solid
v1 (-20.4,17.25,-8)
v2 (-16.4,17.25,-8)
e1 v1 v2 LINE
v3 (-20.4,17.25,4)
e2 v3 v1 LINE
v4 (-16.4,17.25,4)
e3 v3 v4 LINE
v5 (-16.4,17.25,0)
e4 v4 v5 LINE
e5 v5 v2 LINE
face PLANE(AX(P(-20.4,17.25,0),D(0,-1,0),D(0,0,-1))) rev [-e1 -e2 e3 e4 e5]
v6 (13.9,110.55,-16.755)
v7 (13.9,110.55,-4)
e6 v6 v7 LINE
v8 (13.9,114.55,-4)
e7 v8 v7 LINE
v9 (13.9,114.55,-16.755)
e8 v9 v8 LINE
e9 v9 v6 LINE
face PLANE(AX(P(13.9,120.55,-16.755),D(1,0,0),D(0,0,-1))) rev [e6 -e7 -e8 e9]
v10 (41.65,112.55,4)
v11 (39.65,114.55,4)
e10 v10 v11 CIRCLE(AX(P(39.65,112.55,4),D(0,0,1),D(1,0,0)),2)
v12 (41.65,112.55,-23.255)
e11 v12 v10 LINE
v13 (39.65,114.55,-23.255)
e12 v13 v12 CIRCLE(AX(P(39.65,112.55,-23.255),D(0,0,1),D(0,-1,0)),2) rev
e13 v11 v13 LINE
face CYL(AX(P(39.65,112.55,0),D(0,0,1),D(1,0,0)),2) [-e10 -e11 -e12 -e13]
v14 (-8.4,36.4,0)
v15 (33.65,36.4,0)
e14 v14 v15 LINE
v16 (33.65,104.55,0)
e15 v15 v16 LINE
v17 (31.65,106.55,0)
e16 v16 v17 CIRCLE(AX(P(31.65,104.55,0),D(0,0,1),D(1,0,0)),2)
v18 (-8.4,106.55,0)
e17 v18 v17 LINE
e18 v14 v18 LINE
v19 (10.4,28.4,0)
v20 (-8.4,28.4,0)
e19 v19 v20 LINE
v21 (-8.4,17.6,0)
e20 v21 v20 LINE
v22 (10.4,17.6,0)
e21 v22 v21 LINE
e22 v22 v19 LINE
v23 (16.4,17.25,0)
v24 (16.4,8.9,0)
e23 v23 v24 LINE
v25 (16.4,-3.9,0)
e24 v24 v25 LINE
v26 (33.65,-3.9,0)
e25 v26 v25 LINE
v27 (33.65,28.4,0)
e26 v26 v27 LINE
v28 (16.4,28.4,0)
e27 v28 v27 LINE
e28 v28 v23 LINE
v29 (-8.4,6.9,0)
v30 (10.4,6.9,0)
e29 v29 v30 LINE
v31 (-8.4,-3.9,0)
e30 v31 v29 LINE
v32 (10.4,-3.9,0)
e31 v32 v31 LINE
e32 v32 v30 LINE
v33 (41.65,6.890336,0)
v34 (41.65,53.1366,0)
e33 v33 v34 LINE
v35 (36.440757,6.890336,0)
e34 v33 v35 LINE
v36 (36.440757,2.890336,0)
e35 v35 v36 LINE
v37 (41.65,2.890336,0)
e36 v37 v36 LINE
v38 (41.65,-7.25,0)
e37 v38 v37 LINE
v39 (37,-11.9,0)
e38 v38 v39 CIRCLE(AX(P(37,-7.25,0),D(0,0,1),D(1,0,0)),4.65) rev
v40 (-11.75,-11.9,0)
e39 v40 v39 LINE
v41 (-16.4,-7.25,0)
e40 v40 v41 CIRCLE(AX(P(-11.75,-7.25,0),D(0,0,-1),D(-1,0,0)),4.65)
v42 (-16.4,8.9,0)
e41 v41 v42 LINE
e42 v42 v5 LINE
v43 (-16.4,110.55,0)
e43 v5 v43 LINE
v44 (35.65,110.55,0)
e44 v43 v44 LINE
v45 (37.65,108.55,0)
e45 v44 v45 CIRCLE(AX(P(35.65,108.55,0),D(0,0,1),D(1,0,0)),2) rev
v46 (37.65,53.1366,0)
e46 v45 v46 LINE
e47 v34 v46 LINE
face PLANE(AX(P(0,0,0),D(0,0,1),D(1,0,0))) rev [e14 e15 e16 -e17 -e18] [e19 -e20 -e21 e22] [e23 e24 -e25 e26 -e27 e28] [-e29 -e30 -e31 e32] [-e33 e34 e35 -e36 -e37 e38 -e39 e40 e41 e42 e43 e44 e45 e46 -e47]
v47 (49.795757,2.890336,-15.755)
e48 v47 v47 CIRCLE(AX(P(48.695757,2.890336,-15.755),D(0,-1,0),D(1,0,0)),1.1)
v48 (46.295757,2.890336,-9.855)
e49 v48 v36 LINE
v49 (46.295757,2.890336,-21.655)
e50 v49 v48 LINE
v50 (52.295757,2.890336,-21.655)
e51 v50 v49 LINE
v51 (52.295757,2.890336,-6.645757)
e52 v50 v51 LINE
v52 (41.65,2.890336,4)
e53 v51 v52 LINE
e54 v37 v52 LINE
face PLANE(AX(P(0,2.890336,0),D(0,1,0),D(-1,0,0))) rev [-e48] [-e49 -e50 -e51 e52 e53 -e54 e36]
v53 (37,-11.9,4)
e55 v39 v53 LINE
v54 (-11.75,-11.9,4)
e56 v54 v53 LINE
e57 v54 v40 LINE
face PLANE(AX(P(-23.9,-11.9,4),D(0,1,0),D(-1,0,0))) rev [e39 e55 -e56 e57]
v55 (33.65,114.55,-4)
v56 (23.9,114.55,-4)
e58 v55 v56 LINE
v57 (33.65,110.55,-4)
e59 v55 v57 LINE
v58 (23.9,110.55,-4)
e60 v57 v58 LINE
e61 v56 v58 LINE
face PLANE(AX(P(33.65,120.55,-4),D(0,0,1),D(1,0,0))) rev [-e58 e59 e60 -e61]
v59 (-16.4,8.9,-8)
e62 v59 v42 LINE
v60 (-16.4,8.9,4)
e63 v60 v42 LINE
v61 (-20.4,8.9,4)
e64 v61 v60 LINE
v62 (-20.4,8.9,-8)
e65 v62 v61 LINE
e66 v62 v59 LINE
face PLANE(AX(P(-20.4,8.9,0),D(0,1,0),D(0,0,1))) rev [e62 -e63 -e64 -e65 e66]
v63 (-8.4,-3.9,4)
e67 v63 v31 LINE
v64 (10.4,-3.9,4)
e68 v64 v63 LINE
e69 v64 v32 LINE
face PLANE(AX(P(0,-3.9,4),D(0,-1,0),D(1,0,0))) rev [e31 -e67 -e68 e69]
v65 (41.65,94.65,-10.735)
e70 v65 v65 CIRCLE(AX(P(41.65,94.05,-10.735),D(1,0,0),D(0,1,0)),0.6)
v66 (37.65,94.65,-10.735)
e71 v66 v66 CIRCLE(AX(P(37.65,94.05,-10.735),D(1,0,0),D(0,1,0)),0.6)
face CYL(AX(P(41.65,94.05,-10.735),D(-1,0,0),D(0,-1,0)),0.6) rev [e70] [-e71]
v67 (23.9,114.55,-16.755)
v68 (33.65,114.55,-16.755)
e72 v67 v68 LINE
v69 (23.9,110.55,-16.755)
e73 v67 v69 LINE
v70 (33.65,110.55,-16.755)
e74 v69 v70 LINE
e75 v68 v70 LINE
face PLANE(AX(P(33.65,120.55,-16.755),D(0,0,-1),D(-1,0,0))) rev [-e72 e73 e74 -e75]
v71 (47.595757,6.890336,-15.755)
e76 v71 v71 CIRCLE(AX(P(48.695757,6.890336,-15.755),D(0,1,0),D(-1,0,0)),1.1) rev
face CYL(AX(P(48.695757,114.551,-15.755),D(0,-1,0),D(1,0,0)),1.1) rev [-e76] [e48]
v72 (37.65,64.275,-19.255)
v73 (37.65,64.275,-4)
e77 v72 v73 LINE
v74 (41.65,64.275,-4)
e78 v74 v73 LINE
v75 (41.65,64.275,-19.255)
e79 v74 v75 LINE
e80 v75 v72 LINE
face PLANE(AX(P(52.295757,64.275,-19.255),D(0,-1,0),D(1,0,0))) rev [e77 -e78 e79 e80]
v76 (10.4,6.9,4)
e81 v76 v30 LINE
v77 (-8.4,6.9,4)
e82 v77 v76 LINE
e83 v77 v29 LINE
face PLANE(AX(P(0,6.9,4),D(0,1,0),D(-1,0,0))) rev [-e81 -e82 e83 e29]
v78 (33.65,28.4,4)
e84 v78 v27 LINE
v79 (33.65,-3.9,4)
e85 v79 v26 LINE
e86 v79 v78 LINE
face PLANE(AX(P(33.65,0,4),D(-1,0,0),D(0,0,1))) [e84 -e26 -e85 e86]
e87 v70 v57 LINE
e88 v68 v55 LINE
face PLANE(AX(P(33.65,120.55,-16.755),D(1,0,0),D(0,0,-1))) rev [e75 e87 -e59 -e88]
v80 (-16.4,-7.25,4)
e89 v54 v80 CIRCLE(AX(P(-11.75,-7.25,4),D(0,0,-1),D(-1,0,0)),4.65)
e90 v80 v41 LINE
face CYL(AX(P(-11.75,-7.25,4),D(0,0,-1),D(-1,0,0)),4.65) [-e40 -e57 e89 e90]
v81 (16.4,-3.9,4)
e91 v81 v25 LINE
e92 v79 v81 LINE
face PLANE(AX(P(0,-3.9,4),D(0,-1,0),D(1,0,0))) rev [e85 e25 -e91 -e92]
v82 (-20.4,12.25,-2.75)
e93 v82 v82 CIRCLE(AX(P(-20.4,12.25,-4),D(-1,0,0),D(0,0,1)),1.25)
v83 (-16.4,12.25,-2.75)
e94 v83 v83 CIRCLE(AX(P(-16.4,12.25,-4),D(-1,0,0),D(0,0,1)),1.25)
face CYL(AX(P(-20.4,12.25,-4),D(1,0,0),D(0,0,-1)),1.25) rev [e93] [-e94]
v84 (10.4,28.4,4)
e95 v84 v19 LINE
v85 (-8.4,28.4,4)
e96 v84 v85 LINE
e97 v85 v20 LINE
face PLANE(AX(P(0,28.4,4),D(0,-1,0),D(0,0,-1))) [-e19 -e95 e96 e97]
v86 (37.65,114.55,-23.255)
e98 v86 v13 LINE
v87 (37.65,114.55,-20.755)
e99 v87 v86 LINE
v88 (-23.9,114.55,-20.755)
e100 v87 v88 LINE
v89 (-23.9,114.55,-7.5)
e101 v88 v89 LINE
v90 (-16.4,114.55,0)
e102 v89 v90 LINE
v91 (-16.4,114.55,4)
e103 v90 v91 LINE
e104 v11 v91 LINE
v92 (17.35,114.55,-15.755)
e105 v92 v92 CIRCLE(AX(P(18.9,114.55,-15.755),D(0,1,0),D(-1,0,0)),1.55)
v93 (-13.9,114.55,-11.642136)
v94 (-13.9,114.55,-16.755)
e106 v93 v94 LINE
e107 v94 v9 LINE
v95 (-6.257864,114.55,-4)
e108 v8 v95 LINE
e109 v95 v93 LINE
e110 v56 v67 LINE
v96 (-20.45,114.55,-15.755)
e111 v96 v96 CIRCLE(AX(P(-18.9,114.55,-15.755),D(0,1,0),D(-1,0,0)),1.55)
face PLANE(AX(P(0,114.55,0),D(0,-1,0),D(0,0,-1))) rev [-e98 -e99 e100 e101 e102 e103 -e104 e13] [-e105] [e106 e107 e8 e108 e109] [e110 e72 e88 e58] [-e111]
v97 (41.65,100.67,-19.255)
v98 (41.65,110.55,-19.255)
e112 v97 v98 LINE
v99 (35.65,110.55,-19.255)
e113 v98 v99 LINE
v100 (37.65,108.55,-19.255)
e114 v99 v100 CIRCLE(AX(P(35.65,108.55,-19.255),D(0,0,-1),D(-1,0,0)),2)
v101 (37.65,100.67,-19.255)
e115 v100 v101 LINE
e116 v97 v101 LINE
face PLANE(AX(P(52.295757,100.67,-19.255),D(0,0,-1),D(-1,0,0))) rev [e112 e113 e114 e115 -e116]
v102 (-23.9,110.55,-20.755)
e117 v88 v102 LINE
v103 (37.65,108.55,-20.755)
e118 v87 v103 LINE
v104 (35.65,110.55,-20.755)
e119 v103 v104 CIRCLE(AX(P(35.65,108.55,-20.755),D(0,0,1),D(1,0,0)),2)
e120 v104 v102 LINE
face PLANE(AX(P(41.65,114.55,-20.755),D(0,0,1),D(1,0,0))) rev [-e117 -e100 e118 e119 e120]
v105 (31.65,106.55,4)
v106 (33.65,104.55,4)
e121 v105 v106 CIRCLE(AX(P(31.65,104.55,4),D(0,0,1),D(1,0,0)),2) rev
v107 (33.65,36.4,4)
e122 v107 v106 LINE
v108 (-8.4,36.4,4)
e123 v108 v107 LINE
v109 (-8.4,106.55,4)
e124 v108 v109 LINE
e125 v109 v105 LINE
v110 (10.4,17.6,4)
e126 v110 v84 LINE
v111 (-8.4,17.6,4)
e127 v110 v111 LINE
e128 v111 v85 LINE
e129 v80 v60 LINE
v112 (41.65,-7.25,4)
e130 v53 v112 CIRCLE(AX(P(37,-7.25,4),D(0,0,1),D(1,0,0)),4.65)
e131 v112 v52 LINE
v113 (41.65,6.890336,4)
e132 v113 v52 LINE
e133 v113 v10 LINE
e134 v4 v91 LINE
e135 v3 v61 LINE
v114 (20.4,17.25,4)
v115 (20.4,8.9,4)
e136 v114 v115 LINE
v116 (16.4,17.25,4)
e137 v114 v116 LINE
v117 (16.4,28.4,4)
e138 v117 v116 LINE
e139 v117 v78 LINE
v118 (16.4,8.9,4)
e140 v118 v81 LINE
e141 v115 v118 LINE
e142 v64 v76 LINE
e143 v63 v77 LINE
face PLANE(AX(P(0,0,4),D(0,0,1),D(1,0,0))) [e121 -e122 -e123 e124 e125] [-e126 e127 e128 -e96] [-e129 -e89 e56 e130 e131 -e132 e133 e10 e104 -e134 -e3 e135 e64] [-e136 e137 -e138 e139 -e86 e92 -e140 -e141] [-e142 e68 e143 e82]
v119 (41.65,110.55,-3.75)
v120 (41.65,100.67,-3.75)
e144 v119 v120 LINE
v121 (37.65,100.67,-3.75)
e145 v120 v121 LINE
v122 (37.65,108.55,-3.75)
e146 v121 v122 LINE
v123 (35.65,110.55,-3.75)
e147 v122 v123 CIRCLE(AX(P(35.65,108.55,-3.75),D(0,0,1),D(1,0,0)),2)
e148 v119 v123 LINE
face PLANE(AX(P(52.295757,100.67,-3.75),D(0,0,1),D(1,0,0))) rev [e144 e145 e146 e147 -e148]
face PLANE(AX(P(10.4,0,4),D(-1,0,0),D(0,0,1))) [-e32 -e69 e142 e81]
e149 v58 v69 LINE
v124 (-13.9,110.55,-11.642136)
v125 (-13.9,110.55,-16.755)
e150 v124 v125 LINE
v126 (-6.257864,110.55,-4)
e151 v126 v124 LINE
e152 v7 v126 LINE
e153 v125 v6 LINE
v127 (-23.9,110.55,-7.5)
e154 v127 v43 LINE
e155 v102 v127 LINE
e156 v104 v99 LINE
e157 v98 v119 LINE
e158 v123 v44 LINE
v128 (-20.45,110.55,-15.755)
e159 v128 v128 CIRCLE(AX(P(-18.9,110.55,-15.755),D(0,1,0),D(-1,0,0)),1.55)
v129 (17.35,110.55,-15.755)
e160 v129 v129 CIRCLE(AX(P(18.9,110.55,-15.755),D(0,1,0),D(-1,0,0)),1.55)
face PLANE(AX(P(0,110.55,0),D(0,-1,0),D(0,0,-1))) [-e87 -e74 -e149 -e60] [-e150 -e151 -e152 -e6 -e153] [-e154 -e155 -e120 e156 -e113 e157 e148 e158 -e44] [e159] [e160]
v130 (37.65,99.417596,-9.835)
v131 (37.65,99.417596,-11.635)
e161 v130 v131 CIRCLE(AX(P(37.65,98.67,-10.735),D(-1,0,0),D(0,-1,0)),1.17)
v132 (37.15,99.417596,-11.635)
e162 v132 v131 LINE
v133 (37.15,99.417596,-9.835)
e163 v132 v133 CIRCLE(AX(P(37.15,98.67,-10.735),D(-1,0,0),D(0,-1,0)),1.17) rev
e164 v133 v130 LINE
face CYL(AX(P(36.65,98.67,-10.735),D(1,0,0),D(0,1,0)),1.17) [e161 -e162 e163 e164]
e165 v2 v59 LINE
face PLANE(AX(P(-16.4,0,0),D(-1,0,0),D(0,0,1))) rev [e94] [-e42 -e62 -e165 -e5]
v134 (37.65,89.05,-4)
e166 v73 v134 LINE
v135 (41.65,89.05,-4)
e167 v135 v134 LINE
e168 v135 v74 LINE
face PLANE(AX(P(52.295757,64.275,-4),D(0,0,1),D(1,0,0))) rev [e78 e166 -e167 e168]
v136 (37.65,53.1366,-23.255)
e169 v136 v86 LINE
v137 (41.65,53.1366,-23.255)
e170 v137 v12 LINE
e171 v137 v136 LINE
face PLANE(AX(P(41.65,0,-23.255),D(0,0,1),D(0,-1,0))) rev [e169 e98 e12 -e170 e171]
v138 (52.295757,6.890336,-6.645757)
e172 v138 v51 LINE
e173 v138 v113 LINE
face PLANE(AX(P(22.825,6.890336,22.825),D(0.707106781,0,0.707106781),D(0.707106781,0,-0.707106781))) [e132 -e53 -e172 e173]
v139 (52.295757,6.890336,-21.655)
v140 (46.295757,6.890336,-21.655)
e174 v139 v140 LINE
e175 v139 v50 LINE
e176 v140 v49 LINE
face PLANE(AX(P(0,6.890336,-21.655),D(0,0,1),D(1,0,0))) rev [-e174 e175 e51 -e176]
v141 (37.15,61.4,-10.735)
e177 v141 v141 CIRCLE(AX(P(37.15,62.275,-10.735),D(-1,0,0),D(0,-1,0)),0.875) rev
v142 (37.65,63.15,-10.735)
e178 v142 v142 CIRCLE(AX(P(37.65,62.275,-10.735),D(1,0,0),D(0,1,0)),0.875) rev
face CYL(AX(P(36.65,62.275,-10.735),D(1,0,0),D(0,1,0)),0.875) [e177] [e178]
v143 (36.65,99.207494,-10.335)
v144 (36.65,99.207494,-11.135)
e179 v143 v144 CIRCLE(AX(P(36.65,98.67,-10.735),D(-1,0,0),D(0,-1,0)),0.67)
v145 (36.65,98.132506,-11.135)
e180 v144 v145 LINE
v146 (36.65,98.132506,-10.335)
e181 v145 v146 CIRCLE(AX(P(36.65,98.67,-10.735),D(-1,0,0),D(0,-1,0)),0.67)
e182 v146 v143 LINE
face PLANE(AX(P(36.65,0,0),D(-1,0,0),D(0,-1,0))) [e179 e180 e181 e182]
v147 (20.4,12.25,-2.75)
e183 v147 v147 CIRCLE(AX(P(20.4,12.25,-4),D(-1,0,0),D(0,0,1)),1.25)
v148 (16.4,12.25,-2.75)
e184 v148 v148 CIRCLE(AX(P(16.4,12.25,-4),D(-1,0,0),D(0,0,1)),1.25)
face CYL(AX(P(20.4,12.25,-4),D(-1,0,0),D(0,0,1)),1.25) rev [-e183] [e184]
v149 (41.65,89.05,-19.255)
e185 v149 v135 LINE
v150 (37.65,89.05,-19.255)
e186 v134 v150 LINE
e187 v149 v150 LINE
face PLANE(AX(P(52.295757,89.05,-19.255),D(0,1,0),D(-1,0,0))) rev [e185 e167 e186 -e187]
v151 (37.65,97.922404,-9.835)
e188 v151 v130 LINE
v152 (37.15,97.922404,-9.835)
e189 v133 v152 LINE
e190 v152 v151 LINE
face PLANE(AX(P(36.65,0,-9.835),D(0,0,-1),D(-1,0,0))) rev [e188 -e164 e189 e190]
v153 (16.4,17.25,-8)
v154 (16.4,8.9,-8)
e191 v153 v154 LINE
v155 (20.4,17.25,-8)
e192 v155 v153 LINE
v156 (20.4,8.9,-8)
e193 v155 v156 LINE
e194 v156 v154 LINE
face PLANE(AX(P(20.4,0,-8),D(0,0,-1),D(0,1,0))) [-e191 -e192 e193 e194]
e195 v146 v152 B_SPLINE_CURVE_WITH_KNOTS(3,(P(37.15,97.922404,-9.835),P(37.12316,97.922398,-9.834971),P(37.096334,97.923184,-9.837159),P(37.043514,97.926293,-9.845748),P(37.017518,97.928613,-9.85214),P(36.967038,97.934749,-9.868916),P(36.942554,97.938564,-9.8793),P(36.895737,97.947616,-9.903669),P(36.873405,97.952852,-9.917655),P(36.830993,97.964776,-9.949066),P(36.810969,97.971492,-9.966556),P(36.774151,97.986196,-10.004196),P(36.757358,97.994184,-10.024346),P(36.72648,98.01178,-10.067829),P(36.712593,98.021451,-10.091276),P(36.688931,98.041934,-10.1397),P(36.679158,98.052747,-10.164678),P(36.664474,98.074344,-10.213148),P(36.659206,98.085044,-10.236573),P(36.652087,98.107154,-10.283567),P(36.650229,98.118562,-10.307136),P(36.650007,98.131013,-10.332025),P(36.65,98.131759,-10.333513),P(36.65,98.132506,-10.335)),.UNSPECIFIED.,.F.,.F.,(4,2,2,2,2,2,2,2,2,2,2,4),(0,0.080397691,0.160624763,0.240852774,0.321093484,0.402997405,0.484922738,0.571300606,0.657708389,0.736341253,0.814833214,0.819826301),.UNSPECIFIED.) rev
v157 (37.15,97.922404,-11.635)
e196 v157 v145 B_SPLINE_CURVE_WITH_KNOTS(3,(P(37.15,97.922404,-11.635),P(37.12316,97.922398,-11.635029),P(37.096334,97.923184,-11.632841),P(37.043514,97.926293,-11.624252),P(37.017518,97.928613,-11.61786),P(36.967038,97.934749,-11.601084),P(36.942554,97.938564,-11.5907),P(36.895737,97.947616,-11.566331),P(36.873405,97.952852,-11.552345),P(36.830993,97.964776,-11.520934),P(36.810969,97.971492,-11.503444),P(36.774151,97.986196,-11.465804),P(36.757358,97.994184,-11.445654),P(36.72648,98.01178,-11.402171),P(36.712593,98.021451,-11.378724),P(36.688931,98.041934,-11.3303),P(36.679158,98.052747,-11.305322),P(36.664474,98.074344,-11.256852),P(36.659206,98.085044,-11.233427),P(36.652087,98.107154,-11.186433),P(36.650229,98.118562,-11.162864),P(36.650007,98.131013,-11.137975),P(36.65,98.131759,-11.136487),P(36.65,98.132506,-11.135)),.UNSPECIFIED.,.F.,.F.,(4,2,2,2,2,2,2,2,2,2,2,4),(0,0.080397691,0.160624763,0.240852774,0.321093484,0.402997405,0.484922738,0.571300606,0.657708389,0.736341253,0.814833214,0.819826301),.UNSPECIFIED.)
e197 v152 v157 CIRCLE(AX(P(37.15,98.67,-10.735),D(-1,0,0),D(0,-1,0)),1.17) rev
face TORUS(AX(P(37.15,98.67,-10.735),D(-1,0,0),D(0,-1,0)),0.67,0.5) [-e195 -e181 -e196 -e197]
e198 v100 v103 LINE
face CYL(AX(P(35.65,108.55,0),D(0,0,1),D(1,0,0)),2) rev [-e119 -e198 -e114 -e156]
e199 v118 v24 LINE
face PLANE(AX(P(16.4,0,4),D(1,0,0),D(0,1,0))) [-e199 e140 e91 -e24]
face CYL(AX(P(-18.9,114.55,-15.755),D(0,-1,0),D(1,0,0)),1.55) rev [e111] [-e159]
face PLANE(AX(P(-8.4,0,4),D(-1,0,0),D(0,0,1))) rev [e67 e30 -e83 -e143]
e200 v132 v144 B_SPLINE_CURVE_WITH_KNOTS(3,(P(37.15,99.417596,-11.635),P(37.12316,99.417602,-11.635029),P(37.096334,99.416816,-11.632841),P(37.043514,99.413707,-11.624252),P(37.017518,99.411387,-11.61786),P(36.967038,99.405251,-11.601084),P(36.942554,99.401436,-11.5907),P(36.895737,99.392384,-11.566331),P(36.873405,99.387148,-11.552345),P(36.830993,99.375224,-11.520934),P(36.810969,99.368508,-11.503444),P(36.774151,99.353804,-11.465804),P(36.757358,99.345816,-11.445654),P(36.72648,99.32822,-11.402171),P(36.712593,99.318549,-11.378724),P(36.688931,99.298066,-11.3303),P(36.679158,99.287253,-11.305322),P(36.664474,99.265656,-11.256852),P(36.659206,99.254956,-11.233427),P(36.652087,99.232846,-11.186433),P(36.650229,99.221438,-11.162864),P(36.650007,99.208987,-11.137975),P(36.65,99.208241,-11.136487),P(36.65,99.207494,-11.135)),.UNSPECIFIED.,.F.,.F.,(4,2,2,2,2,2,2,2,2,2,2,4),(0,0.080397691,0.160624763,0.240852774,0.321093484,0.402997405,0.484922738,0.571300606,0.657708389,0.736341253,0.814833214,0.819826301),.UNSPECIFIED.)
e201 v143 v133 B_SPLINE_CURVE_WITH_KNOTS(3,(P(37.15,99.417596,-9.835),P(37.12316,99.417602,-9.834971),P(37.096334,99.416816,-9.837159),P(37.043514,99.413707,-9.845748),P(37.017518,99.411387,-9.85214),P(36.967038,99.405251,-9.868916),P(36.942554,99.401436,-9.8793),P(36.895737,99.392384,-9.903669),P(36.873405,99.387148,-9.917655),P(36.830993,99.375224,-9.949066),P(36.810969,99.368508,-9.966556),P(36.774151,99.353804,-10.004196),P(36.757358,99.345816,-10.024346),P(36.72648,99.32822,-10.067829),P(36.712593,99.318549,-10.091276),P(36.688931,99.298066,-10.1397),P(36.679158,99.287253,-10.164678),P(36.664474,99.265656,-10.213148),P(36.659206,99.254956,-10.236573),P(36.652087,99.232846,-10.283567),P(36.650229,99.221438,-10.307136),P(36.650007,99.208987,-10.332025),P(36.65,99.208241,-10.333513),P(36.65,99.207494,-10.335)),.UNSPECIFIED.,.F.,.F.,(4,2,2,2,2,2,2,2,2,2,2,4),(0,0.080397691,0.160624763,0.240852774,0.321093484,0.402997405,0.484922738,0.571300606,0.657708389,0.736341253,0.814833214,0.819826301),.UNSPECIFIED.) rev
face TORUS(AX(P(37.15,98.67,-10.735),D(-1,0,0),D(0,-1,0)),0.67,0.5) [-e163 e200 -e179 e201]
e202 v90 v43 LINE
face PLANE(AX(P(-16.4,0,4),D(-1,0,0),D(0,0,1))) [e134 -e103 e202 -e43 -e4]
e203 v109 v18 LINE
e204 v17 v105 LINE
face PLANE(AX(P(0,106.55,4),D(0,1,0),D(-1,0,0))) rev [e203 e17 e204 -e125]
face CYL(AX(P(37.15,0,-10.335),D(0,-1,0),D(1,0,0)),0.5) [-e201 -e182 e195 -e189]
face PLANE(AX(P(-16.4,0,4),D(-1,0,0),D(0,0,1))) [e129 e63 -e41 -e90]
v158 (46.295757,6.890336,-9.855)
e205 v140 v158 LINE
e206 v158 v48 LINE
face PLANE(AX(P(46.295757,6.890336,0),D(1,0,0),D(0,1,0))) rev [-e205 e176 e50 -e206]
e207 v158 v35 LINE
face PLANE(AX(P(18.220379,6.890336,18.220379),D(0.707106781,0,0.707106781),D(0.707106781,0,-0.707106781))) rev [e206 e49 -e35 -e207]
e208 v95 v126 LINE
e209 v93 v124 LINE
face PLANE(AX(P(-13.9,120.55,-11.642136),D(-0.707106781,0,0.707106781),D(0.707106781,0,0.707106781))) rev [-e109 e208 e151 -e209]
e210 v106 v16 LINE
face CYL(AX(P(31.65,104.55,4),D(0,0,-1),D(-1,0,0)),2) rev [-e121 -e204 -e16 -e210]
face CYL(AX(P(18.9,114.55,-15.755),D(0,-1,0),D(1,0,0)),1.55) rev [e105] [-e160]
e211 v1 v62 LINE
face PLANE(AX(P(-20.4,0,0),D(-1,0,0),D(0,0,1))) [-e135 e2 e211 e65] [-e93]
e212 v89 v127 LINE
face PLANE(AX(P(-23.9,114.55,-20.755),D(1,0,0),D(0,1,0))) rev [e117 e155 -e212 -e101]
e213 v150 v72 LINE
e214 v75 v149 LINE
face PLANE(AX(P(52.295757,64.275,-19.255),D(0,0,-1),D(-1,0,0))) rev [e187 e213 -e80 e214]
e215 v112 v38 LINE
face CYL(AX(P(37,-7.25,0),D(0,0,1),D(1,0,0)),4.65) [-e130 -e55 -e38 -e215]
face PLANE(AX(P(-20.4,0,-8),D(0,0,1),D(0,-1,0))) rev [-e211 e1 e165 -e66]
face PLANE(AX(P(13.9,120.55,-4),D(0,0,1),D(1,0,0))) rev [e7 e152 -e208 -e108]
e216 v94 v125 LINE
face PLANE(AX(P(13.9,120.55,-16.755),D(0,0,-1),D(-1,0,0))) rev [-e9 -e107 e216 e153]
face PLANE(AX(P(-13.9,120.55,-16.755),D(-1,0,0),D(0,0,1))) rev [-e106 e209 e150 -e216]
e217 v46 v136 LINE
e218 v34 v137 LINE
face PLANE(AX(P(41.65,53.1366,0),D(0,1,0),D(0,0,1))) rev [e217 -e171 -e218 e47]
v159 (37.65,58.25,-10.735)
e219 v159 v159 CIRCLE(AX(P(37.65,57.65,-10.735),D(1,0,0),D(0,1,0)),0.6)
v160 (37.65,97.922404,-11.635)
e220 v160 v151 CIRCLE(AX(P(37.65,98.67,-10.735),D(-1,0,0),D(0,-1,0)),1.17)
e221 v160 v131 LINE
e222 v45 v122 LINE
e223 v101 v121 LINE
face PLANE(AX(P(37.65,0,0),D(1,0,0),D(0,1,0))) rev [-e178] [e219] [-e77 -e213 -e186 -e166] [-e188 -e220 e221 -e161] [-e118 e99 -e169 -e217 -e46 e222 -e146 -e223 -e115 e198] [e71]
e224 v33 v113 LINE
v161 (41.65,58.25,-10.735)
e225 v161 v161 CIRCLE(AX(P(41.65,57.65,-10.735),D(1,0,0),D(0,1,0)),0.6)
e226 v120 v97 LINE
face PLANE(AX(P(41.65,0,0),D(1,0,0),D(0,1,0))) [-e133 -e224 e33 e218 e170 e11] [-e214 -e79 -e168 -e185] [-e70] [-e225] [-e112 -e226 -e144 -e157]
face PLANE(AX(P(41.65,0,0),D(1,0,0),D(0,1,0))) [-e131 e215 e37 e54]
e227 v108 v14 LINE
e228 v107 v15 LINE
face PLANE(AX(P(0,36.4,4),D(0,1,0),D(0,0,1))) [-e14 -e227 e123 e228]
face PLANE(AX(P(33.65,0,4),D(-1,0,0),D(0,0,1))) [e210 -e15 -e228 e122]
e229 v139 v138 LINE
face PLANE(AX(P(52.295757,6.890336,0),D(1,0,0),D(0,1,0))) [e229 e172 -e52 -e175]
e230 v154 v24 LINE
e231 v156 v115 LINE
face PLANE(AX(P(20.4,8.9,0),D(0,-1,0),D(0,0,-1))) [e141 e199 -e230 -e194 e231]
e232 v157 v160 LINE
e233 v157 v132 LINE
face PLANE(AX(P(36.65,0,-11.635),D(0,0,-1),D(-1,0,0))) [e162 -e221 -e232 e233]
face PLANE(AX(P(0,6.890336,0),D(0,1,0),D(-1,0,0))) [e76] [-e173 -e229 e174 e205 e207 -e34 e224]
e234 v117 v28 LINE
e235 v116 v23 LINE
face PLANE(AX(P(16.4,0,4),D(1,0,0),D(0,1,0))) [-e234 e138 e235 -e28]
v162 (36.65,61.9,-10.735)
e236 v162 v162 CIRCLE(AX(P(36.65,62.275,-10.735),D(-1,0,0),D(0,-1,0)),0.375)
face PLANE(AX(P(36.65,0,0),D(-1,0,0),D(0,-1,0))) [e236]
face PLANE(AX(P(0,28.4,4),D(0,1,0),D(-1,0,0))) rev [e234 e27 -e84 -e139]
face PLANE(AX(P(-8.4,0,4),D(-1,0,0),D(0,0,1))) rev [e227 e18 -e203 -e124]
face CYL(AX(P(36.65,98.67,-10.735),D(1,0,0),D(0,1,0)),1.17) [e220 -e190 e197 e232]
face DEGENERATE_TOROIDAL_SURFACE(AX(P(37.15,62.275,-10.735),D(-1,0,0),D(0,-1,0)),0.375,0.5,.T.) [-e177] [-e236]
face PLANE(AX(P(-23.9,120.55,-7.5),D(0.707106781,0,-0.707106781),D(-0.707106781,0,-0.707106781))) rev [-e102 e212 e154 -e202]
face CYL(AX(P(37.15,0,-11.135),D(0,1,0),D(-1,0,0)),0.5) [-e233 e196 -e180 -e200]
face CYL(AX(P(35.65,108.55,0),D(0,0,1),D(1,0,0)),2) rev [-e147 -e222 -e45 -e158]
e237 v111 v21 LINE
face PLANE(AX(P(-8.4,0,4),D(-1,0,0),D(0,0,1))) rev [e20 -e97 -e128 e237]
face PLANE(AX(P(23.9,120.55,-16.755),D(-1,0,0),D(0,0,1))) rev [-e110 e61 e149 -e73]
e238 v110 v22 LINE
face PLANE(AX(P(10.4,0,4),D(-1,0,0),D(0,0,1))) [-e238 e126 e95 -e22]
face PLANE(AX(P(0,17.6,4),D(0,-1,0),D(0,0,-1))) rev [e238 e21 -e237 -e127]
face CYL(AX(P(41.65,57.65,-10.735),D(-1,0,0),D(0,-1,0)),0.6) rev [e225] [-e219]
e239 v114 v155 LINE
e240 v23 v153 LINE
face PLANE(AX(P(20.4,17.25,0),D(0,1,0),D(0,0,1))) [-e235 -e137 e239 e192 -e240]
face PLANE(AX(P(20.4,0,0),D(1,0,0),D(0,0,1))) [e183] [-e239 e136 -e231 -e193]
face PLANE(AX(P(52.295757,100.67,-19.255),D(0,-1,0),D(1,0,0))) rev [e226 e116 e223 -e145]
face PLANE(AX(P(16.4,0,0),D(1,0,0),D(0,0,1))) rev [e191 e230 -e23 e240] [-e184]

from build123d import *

# Parameters (mm, degrees)
SKETCH_4_W          = 23.255
SKETCH_4_H          = 57.4134
SKETCH_4_R          = 0.6
EXTRUDE_5_DEPTH     = 4
SKETCH_5_W          = 65.55
SKETCH_5_H          = 20.755
SKETCH_5_R          = 1.55
EXTRUDE_6_DEPTH     = 4
SKETCH_7_W          = 65.55
SKETCH_7_H          = 126.45
EXTRUDE_8_DEPTH     = 4
SKETCH_11_W         = 17.25
SKETCH_11_H         = 32.3
SKETCH_11_W_2       = 18.8
SKETCH_11_H_2       = 10.8
CUT_EXTRUDE_3_DEPTH = 125.085535116
EXTRUDE_9_DEPTH     = 4
CUT_EXTRUDE_4_DEPTH = 10
SKETCH_14_W         = 9.75
SKETCH_14_H         = 12.755
CUT_EXTRUDE_5_DEPTH = 10
SKETCH_16_W         = 15.255
SKETCH_16_H         = 24.775
SKETCH_16_W_2       = 15.505
SKETCH_16_H_2       = 9.88
CUT_EXTRUDE_6_DEPTH = 133.101854737
SKETCH_17_R         = 0.875
EXTRUDE_10_DEPTH    = 1
FILLET_1_R          = 0.5
EXTRUDE_2_DEPTH     = 4
CUT_EXTRUDE_7_REACH = 127.473
SKETCH_19_R         = 1.1
SKETCH_21_W         = 4
SKETCH_21_H         = 2.5
EXTRUDE_11_DEPTH    = 4
FILLET_2_R          = 2
FILLET_3_R          = 4.65


with BuildPart() as part:
    # 草图4 → 凸台-拉伸5 (new body)
    with BuildSketch(Plane(origin=(37.65, 0, 0), x_dir=(0, 0, -1), z_dir=(1, 0, 0))):
        with Locations((11.6275, 81.8433)):
            Rectangle(SKETCH_4_W, SKETCH_4_H)
        with Locations(Location((10.735, 94.05, 0), (0, 0, 90))):
            Circle(SKETCH_4_R, mode=Mode.SUBTRACT)
        with Locations(Location((10.735, 57.65, 0), (0, 0, 90))):
            Circle(SKETCH_4_R, mode=Mode.SUBTRACT)
    extrude(amount=EXTRUDE_5_DEPTH)

    # 草图5 → 凸台-拉伸6 (add)
    with BuildSketch(Plane(origin=(0, 110.55, 0), x_dir=(1, 0, 0), z_dir=(0, 1, 0))):
        with Locations((8.875, 10.3775)):
            Rectangle(SKETCH_5_W, SKETCH_5_H)
        with Locations(Location((-18.9, 15.755, 0), (0, 0, 180))):
            Circle(SKETCH_5_R, mode=Mode.SUBTRACT)
        with Locations(Location((18.9, 15.755, 0), (0, 0, 180))):
            Circle(SKETCH_5_R, mode=Mode.SUBTRACT)
    extrude(amount=EXTRUDE_6_DEPTH)

    # 草图7 → 凸台-拉伸8 (add)
    with BuildSketch(Plane.XY):
        with Locations((8.875, 51.325)):
            Rectangle(SKETCH_7_W, SKETCH_7_H)
    extrude(amount=EXTRUDE_8_DEPTH)

    # 草图11 → 切除-拉伸3 (cut, through all)
    with BuildSketch(Plane(origin=(0, 0, 0), x_dir=(-1, 0, 0), z_dir=(0, 0, -1))):
        with Locations((-25.025, 12.25)):
            Rectangle(SKETCH_11_W, SKETCH_11_H)
        Polygon((-33.65, 106.55), (-33.65, 36.4), (-16.4, 36.4), (8.4, 36.4), (8.4, 106.55), align=None)
        with Locations((-1, 1.5)):
            Rectangle(SKETCH_11_W_2, SKETCH_11_H_2)
        with Locations((-1, 23)):
            Rectangle(SKETCH_11_W_2, SKETCH_11_H_2)
        with BuildLine():
            ThreePointArc((16.4, -7.25), (15.038046533, -10.538046533), (11.75, -11.9))
            Line((11.75, -11.9), (23.9, -11.9))
            Line((23.9, -11.9), (23.9, 106.55))
            Line((23.9, 106.55), (16.4, 106.55))
            Line((16.4, 106.55), (16.4, -7.25))
        make_face()
    extrude(amount=-CUT_EXTRUDE_3_DEPTH, mode=Mode.SUBTRACT)

    # 草图12 → 凸台-拉伸9 (add)
    with BuildSketch(Plane(origin=(0, 2.890336251, 0), x_dir=(1, 0, 0), z_dir=(0, 1, 0))):
        with BuildLine():
            Line((46.295757056, 9.855), (50.995757056, 9.855))
            Line((50.995757056, 9.855), (50.995757056, 15.105))
            Line((50.995757056, 15.105), (49.455691264, 15.105))
            ThreePointArc((49.455691264, 15.105), (47.695757056, 15.755), (49.455691264, 16.405))
            Line((49.455691264, 16.405), (50.995757056, 16.405))
            Line((50.995757056, 16.405), (50.995757056, 21.655))
            Line((50.995757056, 21.655), (46.295757056, 21.655))
            Line((46.295757056, 21.655), (46.295757056, 9.855))
        make_face()
        Polygon((52.295757056, 6.645757056), (52.295757056, 9.855), (50.995757056, 9.855), (46.295757056, 9.855), (36.440757056, 0), (41.65, -4), align=None)
        with BuildLine():
            Line((52.295757056, 9.855), (52.295757056, 21.655))
            Line((52.295757056, 21.655), (50.995757056, 21.655))
            Line((50.995757056, 21.655), (50.995757056, 16.405))
            Line((50.995757056, 16.405), (49.455691264, 16.405))
            ThreePointArc((49.455691264, 16.405), (47.695757056, 15.755), (49.455691264, 15.105))
            Line((49.455691264, 15.105), (50.995757056, 15.105))
            Line((50.995757056, 15.105), (50.995757056, 9.855))
            Line((50.995757056, 9.855), (52.295757056, 9.855))
        make_face()
    extrude(amount=EXTRUDE_9_DEPTH)

    # 草图13 → 切除-拉伸4 (cut, symmetric)
    with BuildSketch(Plane.XZ.offset(-110.55)):
        Polygon((-23.9, -7.5), (-16.4, 0), (-16.4, 4), (-23.9, 4), align=None)
    extrude(amount=CUT_EXTRUDE_4_DEPTH, both=True, mode=Mode.SUBTRACT)

    # 草图14 → 切除-拉伸5 (cut)
    with BuildSketch(Plane.XZ.offset(-110.55)):
        with Locations((28.775, -10.3775)):
            Rectangle(SKETCH_14_W, SKETCH_14_H)
        Polygon((13.9, -16.755), (-13.9, -16.755), (-13.9, -11.642135624), (-6.257864376, -4), (13.9, -4), align=None)
    extrude(amount=-CUT_EXTRUDE_5_DEPTH, mode=Mode.SUBTRACT)

    # 草图16 → 切除-拉伸6 (cut, through all)
    with BuildSketch(Plane.ZY.offset(-37.65)):
        with Locations((-11.6275, 76.6625)):
            Rectangle(SKETCH_16_W, SKETCH_16_H)
        with Locations((-11.5025, 105.61)):
            Rectangle(SKETCH_16_W_2, SKETCH_16_H_2)
    extrude(amount=-CUT_EXTRUDE_6_DEPTH, mode=Mode.SUBTRACT)

    # 草图17 → 凸台-拉伸10 (add)
    with BuildSketch(Plane.ZY.offset(-37.65)):
        with Locations(Location((-10.735, 62.275, 0), (0, 0, 90))):
            Circle(SKETCH_17_R)
        with BuildLine():
            Line((-11.635, 97.922403852), (-11.635, 99.417596148))
            ThreePointArc((-11.635, 99.417596148), (-10.735, 99.84), (-9.835, 99.417596148))
            Line((-9.835, 99.417596148), (-9.835, 97.922403852))
            ThreePointArc((-9.835, 97.922403852), (-10.735, 97.5), (-11.635, 97.922403852))
        make_face()
    extrude(amount=EXTRUDE_10_DEPTH)

    # 圆角1
    # the kernel refuses this fillet: 0.5 mm, written as the material it takes off along each edge
    with BuildSketch(Plane(origin=(36.65, 62.275, -10.735), x_dir=(0, 1, 0), z_dir=(0, 0, 1))) as fillet_1_piece_1:
        with BuildLine():
            CenterArc((0.875 - FILLET_1_R, -FILLET_1_R), FILLET_1_R, 0, 90)
            Line((0.875 - FILLET_1_R, 0), (0.875, 0))
            Line((0.875, 0), (0.875, -FILLET_1_R))
        make_face()
    revolve(axis=Axis((36.65, 62.275, -10.735), (-1, 0, 0)), mode=Mode.SUBTRACT)
    with BuildSketch(Plane(origin=(36.65, 96.672403852, -11.635), x_dir=(1, 0, 0), z_dir=(0, 1, 0)), Plane(origin=(36.65, 100.667596148, -9.835), x_dir=(1, 0, 0), z_dir=(0, -1, 0))) as fillet_1_piece_2:
        with BuildLine():
            CenterArc((FILLET_1_R, -FILLET_1_R), FILLET_1_R, 90, 90)
            Line((0, -FILLET_1_R), (0, 0))
            Line((0, 0), (FILLET_1_R, 0))
        make_face()
    extrude(amount=3.995192295, mode=Mode.SUBTRACT)
    with BuildSketch(Plane(origin=(36.65, 98.67, -10.735), x_dir=(0, 0.36697225923969184, 0.9302318855793519), z_dir=(0, 0.9302318855793519, -0.36697225923969184))) as fillet_1_piece_3:
        with BuildLine():
            CenterArc((1.17 - FILLET_1_R, FILLET_1_R), FILLET_1_R, 270, 90)
            Line((1.17 - FILLET_1_R, 0), (1.17, 0))
            Line((1.17, 0), (1.17, FILLET_1_R))
        make_face()
    revolve(axis=Axis((36.65, 98.67, -10.735), (1, 0, 0)), revolution_arc=223.058018827, mode=Mode.SUBTRACT)
    with BuildSketch(Plane(origin=(36.65, 98.67, -10.735), x_dir=(0, -0.36697225923969184, -0.9302318855793519), z_dir=(0, -0.9302318855793519, 0.36697225923969184))) as fillet_1_piece_4:
        with BuildLine():
            CenterArc((1.17 - FILLET_1_R, FILLET_1_R), FILLET_1_R, 270, 90)
            Line((1.17 - FILLET_1_R, 0), (1.17, 0))
            Line((1.17, 0), (1.17, FILLET_1_R))
        make_face()
    revolve(axis=Axis((36.65, 98.67, -10.735), (1, 0, 0)), revolution_arc=223.058018827, mode=Mode.SUBTRACT)

    # 草图2 → 凸台-拉伸2 (add)
    with BuildSketch(Plane.ZY.offset(16.4)):
        Polygon((-8, 12.25), (-8, 8.9), (4, 8.9), (4, 17.25), (-8, 17.25), align=None)
        with BuildLine():
            ThreePointArc((-2.75, 12.25), (-4, 11), (-5.25, 12.25))
            ThreePointArc((-5.25, 12.25), (-4, 13.5), (-2.75, 12.25))
        make_face(mode=Mode.SUBTRACT)
    extrude_2 = extrude(amount=EXTRUDE_2_DEPTH)

    # 镜向10: 凸台-拉伸2 across plane
    add(extrude_2.mirror(Plane(origin=(0, 0, 0), x_dir=(0, 0, 1), z_dir=(1, 0, 0))))

    # 草图19 → 切除-拉伸7 (cut, up to next)
    with BuildSketch(Plane.XZ.offset(-2.890336251), mode=Mode.PRIVATE) as cut_extrude_7_sk1:
        with Locations((48.695757056, -15.755)):
            Circle(SKETCH_19_R)
    cut_extrude_7_tool1 = extrude(cut_extrude_7_sk1.sketch, amount=-CUT_EXTRUDE_7_REACH, mode=Mode.PRIVATE) & part.part
    add(cut_extrude_7_tool1.solids().sort_by_distance((48.695757, 2.890336, -15.755))[0], mode=Mode.SUBTRACT)

    # 草图21 → 凸台-拉伸11 (add)
    with BuildSketch(Plane(origin=(0, 110.55, 0), x_dir=(1, 0, 0), z_dir=(0, 1, 0))):
        with Locations((39.65, 22.005)):
            Rectangle(SKETCH_21_W, SKETCH_21_H)
    extrude(amount=EXTRUDE_11_DEPTH)

    # 圆角2
    fillet_2_edges = [part.edges().sort_by_distance(p)[0] for p in [
        (33.65, 106.55, 2),
        (37.65, 110.55, -1.875),
        (37.65, 110.55, -20.005),
        (41.65, 114.55, -9.6275),
    ]]
    fillet(fillet_2_edges, radius=FILLET_2_R)

    # 圆角3
    fillet_3_edges = [part.edges().sort_by_distance(p)[0] for p in [
        (41.65, -11.9, 2),
    ]]
    fillet(fillet_3_edges, radius=FILLET_3_R)


solid = part.part
